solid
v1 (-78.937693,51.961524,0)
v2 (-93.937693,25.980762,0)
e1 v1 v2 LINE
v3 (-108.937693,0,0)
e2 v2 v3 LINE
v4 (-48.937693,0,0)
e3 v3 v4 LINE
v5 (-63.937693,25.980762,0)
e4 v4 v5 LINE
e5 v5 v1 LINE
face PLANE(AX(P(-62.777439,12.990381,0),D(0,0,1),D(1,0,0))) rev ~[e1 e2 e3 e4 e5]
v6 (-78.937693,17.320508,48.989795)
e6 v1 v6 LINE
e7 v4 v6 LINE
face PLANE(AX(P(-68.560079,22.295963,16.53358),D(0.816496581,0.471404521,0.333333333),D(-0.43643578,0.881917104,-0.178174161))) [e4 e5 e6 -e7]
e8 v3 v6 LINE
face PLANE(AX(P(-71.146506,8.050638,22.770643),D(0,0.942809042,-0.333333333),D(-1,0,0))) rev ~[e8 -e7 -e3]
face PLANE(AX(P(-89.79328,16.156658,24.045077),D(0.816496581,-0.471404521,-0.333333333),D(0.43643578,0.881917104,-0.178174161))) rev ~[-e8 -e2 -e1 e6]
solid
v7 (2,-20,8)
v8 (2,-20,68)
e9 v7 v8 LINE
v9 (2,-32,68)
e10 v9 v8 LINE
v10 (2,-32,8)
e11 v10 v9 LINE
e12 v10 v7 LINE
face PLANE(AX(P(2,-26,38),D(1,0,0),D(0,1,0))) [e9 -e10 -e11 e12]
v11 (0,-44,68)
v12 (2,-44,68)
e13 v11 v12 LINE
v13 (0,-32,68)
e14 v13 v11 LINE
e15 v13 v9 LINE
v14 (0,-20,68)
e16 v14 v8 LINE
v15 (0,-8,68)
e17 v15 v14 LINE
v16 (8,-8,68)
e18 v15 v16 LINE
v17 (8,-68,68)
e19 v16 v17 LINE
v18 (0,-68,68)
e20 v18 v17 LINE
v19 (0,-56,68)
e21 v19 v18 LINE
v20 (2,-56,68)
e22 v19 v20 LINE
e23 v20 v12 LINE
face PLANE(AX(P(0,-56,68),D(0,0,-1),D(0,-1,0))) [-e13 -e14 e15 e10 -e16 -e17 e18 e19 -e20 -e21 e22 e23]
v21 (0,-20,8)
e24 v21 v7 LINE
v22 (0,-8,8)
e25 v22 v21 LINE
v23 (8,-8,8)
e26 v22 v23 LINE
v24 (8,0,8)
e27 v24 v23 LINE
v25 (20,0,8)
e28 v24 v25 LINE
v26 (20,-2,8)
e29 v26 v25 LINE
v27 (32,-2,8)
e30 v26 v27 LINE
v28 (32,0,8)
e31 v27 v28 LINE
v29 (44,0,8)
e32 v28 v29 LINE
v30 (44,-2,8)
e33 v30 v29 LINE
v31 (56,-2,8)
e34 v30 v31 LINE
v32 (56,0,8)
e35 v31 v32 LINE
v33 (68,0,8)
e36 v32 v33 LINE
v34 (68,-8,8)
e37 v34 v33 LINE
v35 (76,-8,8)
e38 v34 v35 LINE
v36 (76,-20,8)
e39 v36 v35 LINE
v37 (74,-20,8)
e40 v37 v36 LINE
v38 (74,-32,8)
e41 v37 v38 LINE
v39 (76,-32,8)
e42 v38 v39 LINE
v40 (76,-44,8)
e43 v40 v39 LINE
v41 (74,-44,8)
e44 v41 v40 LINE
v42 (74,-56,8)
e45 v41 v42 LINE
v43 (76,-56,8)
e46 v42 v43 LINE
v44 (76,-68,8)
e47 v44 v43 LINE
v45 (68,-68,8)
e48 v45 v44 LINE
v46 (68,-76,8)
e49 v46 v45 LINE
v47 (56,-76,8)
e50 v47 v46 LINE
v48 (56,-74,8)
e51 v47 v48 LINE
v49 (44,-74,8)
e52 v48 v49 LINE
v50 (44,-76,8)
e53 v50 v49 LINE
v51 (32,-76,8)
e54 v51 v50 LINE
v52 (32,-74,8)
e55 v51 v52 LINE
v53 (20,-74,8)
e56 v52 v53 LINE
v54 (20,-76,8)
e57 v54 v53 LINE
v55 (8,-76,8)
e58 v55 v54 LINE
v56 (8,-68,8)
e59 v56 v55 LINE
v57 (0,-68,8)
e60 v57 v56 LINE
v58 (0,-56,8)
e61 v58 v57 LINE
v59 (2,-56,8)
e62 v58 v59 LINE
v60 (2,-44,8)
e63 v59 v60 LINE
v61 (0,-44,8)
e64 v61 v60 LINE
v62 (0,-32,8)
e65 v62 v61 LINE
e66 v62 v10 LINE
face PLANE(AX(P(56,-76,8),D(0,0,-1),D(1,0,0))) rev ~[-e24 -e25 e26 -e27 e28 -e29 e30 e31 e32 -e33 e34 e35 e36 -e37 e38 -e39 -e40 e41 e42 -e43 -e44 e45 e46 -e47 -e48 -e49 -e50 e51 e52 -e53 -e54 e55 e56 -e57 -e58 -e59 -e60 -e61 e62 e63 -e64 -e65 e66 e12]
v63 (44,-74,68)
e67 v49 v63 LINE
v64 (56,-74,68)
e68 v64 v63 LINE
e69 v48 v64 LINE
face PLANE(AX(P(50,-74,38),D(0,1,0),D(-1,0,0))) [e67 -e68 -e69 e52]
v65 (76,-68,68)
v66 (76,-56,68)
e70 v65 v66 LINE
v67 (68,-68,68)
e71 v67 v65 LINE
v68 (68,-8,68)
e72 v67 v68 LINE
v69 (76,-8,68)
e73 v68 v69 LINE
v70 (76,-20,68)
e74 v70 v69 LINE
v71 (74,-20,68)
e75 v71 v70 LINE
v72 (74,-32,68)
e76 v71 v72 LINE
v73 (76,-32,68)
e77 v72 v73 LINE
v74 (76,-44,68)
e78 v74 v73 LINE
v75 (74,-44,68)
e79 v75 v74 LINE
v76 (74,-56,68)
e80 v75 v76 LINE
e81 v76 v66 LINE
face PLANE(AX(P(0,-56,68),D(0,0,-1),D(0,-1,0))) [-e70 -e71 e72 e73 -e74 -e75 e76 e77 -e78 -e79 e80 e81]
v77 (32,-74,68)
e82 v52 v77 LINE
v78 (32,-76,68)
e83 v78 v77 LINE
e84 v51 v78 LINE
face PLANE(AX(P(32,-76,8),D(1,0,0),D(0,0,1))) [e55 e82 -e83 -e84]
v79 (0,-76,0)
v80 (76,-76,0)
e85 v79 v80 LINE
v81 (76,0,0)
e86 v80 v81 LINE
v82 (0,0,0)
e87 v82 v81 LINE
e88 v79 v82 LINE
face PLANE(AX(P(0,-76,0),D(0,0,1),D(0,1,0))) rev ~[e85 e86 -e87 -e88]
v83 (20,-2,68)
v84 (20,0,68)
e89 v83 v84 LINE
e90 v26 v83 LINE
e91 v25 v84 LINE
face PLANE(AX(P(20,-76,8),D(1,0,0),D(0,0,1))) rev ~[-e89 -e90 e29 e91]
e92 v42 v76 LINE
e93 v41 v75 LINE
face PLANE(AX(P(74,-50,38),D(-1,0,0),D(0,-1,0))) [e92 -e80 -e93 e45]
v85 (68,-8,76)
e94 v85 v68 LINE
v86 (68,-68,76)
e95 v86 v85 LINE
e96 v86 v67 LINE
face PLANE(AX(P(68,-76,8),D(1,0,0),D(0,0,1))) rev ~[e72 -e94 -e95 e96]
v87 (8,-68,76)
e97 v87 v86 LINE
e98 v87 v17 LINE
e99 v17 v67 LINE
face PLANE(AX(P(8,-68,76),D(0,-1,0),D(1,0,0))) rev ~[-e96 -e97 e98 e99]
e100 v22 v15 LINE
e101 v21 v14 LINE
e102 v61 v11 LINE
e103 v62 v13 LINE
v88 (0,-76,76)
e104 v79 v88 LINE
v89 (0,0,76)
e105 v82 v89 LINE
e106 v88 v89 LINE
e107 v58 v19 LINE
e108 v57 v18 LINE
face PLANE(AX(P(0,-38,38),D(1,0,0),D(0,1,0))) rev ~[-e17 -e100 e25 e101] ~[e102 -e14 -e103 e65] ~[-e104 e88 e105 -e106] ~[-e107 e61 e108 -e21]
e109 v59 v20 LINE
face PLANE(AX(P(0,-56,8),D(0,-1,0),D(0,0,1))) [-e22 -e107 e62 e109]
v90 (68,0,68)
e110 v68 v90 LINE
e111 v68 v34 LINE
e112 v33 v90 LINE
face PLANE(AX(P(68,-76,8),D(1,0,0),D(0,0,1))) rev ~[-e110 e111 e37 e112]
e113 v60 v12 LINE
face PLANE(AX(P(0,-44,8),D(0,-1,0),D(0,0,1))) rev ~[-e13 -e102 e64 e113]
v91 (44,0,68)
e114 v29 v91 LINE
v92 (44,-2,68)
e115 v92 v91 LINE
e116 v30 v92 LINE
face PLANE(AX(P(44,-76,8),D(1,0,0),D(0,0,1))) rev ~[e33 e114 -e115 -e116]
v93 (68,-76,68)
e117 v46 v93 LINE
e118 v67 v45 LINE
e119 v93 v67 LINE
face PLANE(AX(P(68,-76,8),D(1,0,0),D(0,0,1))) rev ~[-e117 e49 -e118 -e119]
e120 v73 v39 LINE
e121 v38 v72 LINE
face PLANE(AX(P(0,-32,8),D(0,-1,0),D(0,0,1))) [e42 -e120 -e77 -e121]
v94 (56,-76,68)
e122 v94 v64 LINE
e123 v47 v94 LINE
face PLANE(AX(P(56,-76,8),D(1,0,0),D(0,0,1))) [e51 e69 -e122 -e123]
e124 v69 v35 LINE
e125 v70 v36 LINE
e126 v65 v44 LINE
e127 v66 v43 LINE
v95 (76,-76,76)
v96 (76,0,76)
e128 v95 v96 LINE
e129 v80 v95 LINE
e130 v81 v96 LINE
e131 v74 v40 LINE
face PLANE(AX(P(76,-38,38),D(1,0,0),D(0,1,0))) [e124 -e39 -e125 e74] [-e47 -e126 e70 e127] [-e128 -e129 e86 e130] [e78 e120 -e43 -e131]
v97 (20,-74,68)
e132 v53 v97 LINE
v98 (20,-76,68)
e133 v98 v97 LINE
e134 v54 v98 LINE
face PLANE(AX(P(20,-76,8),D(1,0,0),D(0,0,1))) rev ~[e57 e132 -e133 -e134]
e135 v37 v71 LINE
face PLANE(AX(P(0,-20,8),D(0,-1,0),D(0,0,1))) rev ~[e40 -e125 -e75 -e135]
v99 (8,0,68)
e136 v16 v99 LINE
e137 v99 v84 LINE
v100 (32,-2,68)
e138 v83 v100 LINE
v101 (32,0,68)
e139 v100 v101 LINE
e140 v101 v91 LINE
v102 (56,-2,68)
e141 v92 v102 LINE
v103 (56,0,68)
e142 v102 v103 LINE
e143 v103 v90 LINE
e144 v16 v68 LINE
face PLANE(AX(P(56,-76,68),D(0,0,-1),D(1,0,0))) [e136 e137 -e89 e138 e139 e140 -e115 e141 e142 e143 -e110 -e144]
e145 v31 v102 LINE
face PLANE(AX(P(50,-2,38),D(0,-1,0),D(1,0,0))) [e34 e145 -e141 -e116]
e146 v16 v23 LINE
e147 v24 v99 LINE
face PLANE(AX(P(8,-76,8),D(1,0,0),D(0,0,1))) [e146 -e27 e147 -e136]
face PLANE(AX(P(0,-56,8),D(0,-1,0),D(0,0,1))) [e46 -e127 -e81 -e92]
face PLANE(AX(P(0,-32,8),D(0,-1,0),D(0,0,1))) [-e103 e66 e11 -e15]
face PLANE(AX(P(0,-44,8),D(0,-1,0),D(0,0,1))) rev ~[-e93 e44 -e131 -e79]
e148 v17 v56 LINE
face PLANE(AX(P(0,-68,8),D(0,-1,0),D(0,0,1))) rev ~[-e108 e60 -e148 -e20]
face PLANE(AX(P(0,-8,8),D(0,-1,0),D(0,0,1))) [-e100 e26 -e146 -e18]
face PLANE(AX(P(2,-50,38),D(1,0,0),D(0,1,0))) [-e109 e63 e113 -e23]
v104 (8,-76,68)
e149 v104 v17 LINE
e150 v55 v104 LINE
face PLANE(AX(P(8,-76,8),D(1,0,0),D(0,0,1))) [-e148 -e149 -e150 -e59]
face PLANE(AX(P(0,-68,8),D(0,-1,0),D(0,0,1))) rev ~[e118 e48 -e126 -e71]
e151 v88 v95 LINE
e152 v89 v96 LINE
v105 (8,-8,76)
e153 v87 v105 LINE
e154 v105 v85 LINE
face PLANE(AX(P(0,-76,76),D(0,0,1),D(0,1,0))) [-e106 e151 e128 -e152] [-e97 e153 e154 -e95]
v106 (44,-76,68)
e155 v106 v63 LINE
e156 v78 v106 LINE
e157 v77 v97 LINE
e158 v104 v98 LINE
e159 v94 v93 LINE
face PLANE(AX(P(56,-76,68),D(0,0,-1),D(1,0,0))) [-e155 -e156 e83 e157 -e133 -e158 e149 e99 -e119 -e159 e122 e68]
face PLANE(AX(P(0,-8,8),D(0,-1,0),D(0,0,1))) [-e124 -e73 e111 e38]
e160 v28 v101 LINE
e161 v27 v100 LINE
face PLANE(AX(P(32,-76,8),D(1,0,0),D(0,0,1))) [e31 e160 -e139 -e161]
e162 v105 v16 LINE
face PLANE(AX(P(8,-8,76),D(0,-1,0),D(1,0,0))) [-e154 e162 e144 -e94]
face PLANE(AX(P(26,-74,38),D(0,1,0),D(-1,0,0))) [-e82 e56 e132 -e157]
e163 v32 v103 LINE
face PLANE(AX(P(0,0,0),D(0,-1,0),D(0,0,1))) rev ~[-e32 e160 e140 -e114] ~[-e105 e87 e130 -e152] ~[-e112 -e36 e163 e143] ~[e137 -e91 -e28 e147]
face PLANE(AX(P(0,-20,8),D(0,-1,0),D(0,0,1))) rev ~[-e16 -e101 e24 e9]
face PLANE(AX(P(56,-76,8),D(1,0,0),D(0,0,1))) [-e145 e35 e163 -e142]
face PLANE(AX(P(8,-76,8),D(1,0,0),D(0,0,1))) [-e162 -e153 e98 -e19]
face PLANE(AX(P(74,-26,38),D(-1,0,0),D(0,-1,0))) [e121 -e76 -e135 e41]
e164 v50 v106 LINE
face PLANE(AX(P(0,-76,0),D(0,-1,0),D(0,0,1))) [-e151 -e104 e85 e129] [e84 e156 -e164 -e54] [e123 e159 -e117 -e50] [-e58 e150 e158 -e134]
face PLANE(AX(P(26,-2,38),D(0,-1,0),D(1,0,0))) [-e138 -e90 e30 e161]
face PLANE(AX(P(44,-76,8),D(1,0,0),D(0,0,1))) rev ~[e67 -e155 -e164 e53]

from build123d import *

# Parameters (mm, degrees)
F0_W      = 76
F0_H      = 76
F1_DEPTH  = 76
F2_W      = 60
F2_H      = 60
F3_DEPTH  = 68
F4_W      = 12
F4_H      = 60
F5_DEPTH  = 100
F6_W      = 12
F6_H      = 60
F7_DEPTH  = 6
F8_W      = 12
F8_H      = 60
F9_DEPTH  = 6
F10_W     = 12
F10_H     = 60
F11_DEPTH = 99
F12_W     = 12
F12_H     = 60
F13_DEPTH = 6
F14_W     = 12
F14_H     = 60
F15_DEPTH = 6
F17_DEPTH = 48.9897948557
F20_W     = 96.6173894703
F20_H     = 69.0555498004
F21_DEPTH = 25
F23_W     = 74.8236617073
F23_H     = 72.9810190387
F24_DEPTH = 25
F26_W     = 108.0368701369
F26_H     = 112.1664643288
F27_DEPTH = 25


# Not quite as in the source:
# - a feature names something its author has since deleted; it is built from what else it names


with BuildPart() as f1:
    # F0 (on Right) → F1 (new body)
    with BuildSketch(Plane.YZ):
        with Locations((-38, 38)):
            Rectangle(F0_W, F0_H)
    extrude(amount=F1_DEPTH)

    # F2 (on face) → F3 (cut)
    with BuildSketch(Plane.XY.offset(76)):
        with Locations((38, -38)):
            Rectangle(F2_W, F2_H)
    extrude(amount=-F3_DEPTH, mode=Mode.SUBTRACT)

    # F4 (on face) → F5 (cut)
    with BuildSketch(Plane.XZ.offset(76)):
        with Locations((14, 38)):
            Rectangle(F4_W, F4_H)
        with Locations((38, 38)):
            Rectangle(F4_W, F4_H)
        with Locations((62, 38)):
            Rectangle(F4_W, F4_H)
    extrude(amount=-F5_DEPTH, mode=Mode.SUBTRACT)

    # F6 (on face) → F7 (cut)
    with BuildSketch(Plane(origin=(0, -68, 0), x_dir=(-1, 0, 0), z_dir=(0, 1, 0))):
        with Locations((-50, 38)):
            Rectangle(F6_W, F6_H)
        with Locations((-26, 38)):
            Rectangle(F6_W, F6_H)
    extrude(amount=-F7_DEPTH, mode=Mode.SUBTRACT)

    # F8 (on face) → F9 (cut)
    with BuildSketch(Plane.XZ.offset(8)):
        with Locations((50, 38)):
            Rectangle(F8_W, F8_H)
        with Locations((26, 38)):
            Rectangle(F8_W, F8_H)
    extrude(amount=-F9_DEPTH, mode=Mode.SUBTRACT)

    # F10 (on face) → F11 (cut)
    with BuildSketch(Plane(origin=(0, 0, 0), x_dir=(0, -1, 0), z_dir=(-1, 0, 0))):
        with Locations((14, 38)):
            Rectangle(F10_W, F10_H)
        with Locations((38, 38)):
            Rectangle(F10_W, F10_H)
        with Locations((62, 38)):
            Rectangle(F10_W, F10_H)
    extrude(amount=-F11_DEPTH, mode=Mode.SUBTRACT)

    # F12 (on face) → F13 (cut)
    with BuildSketch(Plane.YZ.offset(8)):
        with Locations((-26, 38)):
            Rectangle(F12_W, F12_H)
        with Locations((-50, 38)):
            Rectangle(F12_W, F12_H)
    extrude(amount=-F13_DEPTH, mode=Mode.SUBTRACT)

    # F14 (on face) → F15 (cut)
    with BuildSketch(Plane(origin=(68, 0, 0), x_dir=(0, -1, 0), z_dir=(-1, 0, 0))):
        with Locations((50, 38)):
            Rectangle(F14_W, F14_H)
        with Locations((26, 38)):
            Rectangle(F14_W, F14_H)
    extrude(amount=-F15_DEPTH, mode=Mode.SUBTRACT)


with BuildPart() as f17:
    # F16 (on Top) → F17 (new body)
    with BuildSketch(Plane.XY):
        Polygon((-63.9376926764, 25.9807621135), (-78.9376926764, 17.3205080757), (-48.9376926764, 0), align=None)
        Polygon((-78.9376926764, 51.9615242271), (-78.9376926764, 17.3205080757), (-63.9376926764, 25.9807621135), align=None)
        Polygon((-78.9376926764, 51.9615242271), (-93.9376926764, 25.9807621135), (-78.9376926764, 17.3205080757), align=None)
        Polygon((-93.9376926764, 25.9807621135), (-108.9376926764, 0), (-78.9376926764, 17.3205080757), align=None)
        Polygon((-78.9376926764, 17.3205080757), (-108.9376926764, 0), (-78.9376926764, 0), align=None)
        Polygon((-78.9376926764, 17.3205080757), (-78.9376926764, 0), (-48.9376926764, 0), align=None)
    extrude(amount=F17_DEPTH)

    # F20 (on 3pt) → F21 (cut)
    with BuildSketch(Plane(origin=(-72.6251284509, 41.9301374611, 29.6490845348), x_dir=(0.4364357805, 0.8819171037, -0.1781741613), z_dir=(0.8164965809, -0.4714045208, -0.3333333333))):
        with Locations((-29.2243789881, -11.6772539914)):
            Rectangle(F20_W, F20_H)
    extrude(amount=-F21_DEPTH, mode=Mode.SUBTRACT)

    # F23 (on 3pt) → F24 (cut)
    with BuildSketch(Plane(origin=(-32.6251284509, -18.8361266935, -13.3191529162), x_dir=(-0.4364357805, 0.8819171037, -0.1781741613), z_dir=(0.8164965809, 0.4714045208, 0.3333333333))):
        with Locations((46.6394056566, 41.2203946617)):
            Rectangle(F23_W, F23_H)
    extrude(amount=F24_DEPTH, mode=Mode.SUBTRACT)

    # F26 (on 3pt) → F27 (cut)
    with BuildSketch(Plane(origin=(0, 0, 0), x_dir=(-1, 0, 0), z_dir=(0, 0.9428090416, -0.3333333333))):
        with Locations((71.1465058848, 24.1519138217)):
            Rectangle(F26_W, F26_H)
    extrude(amount=-F27_DEPTH, mode=Mode.SUBTRACT)


solid = Compound([f1.part, f17.part])
